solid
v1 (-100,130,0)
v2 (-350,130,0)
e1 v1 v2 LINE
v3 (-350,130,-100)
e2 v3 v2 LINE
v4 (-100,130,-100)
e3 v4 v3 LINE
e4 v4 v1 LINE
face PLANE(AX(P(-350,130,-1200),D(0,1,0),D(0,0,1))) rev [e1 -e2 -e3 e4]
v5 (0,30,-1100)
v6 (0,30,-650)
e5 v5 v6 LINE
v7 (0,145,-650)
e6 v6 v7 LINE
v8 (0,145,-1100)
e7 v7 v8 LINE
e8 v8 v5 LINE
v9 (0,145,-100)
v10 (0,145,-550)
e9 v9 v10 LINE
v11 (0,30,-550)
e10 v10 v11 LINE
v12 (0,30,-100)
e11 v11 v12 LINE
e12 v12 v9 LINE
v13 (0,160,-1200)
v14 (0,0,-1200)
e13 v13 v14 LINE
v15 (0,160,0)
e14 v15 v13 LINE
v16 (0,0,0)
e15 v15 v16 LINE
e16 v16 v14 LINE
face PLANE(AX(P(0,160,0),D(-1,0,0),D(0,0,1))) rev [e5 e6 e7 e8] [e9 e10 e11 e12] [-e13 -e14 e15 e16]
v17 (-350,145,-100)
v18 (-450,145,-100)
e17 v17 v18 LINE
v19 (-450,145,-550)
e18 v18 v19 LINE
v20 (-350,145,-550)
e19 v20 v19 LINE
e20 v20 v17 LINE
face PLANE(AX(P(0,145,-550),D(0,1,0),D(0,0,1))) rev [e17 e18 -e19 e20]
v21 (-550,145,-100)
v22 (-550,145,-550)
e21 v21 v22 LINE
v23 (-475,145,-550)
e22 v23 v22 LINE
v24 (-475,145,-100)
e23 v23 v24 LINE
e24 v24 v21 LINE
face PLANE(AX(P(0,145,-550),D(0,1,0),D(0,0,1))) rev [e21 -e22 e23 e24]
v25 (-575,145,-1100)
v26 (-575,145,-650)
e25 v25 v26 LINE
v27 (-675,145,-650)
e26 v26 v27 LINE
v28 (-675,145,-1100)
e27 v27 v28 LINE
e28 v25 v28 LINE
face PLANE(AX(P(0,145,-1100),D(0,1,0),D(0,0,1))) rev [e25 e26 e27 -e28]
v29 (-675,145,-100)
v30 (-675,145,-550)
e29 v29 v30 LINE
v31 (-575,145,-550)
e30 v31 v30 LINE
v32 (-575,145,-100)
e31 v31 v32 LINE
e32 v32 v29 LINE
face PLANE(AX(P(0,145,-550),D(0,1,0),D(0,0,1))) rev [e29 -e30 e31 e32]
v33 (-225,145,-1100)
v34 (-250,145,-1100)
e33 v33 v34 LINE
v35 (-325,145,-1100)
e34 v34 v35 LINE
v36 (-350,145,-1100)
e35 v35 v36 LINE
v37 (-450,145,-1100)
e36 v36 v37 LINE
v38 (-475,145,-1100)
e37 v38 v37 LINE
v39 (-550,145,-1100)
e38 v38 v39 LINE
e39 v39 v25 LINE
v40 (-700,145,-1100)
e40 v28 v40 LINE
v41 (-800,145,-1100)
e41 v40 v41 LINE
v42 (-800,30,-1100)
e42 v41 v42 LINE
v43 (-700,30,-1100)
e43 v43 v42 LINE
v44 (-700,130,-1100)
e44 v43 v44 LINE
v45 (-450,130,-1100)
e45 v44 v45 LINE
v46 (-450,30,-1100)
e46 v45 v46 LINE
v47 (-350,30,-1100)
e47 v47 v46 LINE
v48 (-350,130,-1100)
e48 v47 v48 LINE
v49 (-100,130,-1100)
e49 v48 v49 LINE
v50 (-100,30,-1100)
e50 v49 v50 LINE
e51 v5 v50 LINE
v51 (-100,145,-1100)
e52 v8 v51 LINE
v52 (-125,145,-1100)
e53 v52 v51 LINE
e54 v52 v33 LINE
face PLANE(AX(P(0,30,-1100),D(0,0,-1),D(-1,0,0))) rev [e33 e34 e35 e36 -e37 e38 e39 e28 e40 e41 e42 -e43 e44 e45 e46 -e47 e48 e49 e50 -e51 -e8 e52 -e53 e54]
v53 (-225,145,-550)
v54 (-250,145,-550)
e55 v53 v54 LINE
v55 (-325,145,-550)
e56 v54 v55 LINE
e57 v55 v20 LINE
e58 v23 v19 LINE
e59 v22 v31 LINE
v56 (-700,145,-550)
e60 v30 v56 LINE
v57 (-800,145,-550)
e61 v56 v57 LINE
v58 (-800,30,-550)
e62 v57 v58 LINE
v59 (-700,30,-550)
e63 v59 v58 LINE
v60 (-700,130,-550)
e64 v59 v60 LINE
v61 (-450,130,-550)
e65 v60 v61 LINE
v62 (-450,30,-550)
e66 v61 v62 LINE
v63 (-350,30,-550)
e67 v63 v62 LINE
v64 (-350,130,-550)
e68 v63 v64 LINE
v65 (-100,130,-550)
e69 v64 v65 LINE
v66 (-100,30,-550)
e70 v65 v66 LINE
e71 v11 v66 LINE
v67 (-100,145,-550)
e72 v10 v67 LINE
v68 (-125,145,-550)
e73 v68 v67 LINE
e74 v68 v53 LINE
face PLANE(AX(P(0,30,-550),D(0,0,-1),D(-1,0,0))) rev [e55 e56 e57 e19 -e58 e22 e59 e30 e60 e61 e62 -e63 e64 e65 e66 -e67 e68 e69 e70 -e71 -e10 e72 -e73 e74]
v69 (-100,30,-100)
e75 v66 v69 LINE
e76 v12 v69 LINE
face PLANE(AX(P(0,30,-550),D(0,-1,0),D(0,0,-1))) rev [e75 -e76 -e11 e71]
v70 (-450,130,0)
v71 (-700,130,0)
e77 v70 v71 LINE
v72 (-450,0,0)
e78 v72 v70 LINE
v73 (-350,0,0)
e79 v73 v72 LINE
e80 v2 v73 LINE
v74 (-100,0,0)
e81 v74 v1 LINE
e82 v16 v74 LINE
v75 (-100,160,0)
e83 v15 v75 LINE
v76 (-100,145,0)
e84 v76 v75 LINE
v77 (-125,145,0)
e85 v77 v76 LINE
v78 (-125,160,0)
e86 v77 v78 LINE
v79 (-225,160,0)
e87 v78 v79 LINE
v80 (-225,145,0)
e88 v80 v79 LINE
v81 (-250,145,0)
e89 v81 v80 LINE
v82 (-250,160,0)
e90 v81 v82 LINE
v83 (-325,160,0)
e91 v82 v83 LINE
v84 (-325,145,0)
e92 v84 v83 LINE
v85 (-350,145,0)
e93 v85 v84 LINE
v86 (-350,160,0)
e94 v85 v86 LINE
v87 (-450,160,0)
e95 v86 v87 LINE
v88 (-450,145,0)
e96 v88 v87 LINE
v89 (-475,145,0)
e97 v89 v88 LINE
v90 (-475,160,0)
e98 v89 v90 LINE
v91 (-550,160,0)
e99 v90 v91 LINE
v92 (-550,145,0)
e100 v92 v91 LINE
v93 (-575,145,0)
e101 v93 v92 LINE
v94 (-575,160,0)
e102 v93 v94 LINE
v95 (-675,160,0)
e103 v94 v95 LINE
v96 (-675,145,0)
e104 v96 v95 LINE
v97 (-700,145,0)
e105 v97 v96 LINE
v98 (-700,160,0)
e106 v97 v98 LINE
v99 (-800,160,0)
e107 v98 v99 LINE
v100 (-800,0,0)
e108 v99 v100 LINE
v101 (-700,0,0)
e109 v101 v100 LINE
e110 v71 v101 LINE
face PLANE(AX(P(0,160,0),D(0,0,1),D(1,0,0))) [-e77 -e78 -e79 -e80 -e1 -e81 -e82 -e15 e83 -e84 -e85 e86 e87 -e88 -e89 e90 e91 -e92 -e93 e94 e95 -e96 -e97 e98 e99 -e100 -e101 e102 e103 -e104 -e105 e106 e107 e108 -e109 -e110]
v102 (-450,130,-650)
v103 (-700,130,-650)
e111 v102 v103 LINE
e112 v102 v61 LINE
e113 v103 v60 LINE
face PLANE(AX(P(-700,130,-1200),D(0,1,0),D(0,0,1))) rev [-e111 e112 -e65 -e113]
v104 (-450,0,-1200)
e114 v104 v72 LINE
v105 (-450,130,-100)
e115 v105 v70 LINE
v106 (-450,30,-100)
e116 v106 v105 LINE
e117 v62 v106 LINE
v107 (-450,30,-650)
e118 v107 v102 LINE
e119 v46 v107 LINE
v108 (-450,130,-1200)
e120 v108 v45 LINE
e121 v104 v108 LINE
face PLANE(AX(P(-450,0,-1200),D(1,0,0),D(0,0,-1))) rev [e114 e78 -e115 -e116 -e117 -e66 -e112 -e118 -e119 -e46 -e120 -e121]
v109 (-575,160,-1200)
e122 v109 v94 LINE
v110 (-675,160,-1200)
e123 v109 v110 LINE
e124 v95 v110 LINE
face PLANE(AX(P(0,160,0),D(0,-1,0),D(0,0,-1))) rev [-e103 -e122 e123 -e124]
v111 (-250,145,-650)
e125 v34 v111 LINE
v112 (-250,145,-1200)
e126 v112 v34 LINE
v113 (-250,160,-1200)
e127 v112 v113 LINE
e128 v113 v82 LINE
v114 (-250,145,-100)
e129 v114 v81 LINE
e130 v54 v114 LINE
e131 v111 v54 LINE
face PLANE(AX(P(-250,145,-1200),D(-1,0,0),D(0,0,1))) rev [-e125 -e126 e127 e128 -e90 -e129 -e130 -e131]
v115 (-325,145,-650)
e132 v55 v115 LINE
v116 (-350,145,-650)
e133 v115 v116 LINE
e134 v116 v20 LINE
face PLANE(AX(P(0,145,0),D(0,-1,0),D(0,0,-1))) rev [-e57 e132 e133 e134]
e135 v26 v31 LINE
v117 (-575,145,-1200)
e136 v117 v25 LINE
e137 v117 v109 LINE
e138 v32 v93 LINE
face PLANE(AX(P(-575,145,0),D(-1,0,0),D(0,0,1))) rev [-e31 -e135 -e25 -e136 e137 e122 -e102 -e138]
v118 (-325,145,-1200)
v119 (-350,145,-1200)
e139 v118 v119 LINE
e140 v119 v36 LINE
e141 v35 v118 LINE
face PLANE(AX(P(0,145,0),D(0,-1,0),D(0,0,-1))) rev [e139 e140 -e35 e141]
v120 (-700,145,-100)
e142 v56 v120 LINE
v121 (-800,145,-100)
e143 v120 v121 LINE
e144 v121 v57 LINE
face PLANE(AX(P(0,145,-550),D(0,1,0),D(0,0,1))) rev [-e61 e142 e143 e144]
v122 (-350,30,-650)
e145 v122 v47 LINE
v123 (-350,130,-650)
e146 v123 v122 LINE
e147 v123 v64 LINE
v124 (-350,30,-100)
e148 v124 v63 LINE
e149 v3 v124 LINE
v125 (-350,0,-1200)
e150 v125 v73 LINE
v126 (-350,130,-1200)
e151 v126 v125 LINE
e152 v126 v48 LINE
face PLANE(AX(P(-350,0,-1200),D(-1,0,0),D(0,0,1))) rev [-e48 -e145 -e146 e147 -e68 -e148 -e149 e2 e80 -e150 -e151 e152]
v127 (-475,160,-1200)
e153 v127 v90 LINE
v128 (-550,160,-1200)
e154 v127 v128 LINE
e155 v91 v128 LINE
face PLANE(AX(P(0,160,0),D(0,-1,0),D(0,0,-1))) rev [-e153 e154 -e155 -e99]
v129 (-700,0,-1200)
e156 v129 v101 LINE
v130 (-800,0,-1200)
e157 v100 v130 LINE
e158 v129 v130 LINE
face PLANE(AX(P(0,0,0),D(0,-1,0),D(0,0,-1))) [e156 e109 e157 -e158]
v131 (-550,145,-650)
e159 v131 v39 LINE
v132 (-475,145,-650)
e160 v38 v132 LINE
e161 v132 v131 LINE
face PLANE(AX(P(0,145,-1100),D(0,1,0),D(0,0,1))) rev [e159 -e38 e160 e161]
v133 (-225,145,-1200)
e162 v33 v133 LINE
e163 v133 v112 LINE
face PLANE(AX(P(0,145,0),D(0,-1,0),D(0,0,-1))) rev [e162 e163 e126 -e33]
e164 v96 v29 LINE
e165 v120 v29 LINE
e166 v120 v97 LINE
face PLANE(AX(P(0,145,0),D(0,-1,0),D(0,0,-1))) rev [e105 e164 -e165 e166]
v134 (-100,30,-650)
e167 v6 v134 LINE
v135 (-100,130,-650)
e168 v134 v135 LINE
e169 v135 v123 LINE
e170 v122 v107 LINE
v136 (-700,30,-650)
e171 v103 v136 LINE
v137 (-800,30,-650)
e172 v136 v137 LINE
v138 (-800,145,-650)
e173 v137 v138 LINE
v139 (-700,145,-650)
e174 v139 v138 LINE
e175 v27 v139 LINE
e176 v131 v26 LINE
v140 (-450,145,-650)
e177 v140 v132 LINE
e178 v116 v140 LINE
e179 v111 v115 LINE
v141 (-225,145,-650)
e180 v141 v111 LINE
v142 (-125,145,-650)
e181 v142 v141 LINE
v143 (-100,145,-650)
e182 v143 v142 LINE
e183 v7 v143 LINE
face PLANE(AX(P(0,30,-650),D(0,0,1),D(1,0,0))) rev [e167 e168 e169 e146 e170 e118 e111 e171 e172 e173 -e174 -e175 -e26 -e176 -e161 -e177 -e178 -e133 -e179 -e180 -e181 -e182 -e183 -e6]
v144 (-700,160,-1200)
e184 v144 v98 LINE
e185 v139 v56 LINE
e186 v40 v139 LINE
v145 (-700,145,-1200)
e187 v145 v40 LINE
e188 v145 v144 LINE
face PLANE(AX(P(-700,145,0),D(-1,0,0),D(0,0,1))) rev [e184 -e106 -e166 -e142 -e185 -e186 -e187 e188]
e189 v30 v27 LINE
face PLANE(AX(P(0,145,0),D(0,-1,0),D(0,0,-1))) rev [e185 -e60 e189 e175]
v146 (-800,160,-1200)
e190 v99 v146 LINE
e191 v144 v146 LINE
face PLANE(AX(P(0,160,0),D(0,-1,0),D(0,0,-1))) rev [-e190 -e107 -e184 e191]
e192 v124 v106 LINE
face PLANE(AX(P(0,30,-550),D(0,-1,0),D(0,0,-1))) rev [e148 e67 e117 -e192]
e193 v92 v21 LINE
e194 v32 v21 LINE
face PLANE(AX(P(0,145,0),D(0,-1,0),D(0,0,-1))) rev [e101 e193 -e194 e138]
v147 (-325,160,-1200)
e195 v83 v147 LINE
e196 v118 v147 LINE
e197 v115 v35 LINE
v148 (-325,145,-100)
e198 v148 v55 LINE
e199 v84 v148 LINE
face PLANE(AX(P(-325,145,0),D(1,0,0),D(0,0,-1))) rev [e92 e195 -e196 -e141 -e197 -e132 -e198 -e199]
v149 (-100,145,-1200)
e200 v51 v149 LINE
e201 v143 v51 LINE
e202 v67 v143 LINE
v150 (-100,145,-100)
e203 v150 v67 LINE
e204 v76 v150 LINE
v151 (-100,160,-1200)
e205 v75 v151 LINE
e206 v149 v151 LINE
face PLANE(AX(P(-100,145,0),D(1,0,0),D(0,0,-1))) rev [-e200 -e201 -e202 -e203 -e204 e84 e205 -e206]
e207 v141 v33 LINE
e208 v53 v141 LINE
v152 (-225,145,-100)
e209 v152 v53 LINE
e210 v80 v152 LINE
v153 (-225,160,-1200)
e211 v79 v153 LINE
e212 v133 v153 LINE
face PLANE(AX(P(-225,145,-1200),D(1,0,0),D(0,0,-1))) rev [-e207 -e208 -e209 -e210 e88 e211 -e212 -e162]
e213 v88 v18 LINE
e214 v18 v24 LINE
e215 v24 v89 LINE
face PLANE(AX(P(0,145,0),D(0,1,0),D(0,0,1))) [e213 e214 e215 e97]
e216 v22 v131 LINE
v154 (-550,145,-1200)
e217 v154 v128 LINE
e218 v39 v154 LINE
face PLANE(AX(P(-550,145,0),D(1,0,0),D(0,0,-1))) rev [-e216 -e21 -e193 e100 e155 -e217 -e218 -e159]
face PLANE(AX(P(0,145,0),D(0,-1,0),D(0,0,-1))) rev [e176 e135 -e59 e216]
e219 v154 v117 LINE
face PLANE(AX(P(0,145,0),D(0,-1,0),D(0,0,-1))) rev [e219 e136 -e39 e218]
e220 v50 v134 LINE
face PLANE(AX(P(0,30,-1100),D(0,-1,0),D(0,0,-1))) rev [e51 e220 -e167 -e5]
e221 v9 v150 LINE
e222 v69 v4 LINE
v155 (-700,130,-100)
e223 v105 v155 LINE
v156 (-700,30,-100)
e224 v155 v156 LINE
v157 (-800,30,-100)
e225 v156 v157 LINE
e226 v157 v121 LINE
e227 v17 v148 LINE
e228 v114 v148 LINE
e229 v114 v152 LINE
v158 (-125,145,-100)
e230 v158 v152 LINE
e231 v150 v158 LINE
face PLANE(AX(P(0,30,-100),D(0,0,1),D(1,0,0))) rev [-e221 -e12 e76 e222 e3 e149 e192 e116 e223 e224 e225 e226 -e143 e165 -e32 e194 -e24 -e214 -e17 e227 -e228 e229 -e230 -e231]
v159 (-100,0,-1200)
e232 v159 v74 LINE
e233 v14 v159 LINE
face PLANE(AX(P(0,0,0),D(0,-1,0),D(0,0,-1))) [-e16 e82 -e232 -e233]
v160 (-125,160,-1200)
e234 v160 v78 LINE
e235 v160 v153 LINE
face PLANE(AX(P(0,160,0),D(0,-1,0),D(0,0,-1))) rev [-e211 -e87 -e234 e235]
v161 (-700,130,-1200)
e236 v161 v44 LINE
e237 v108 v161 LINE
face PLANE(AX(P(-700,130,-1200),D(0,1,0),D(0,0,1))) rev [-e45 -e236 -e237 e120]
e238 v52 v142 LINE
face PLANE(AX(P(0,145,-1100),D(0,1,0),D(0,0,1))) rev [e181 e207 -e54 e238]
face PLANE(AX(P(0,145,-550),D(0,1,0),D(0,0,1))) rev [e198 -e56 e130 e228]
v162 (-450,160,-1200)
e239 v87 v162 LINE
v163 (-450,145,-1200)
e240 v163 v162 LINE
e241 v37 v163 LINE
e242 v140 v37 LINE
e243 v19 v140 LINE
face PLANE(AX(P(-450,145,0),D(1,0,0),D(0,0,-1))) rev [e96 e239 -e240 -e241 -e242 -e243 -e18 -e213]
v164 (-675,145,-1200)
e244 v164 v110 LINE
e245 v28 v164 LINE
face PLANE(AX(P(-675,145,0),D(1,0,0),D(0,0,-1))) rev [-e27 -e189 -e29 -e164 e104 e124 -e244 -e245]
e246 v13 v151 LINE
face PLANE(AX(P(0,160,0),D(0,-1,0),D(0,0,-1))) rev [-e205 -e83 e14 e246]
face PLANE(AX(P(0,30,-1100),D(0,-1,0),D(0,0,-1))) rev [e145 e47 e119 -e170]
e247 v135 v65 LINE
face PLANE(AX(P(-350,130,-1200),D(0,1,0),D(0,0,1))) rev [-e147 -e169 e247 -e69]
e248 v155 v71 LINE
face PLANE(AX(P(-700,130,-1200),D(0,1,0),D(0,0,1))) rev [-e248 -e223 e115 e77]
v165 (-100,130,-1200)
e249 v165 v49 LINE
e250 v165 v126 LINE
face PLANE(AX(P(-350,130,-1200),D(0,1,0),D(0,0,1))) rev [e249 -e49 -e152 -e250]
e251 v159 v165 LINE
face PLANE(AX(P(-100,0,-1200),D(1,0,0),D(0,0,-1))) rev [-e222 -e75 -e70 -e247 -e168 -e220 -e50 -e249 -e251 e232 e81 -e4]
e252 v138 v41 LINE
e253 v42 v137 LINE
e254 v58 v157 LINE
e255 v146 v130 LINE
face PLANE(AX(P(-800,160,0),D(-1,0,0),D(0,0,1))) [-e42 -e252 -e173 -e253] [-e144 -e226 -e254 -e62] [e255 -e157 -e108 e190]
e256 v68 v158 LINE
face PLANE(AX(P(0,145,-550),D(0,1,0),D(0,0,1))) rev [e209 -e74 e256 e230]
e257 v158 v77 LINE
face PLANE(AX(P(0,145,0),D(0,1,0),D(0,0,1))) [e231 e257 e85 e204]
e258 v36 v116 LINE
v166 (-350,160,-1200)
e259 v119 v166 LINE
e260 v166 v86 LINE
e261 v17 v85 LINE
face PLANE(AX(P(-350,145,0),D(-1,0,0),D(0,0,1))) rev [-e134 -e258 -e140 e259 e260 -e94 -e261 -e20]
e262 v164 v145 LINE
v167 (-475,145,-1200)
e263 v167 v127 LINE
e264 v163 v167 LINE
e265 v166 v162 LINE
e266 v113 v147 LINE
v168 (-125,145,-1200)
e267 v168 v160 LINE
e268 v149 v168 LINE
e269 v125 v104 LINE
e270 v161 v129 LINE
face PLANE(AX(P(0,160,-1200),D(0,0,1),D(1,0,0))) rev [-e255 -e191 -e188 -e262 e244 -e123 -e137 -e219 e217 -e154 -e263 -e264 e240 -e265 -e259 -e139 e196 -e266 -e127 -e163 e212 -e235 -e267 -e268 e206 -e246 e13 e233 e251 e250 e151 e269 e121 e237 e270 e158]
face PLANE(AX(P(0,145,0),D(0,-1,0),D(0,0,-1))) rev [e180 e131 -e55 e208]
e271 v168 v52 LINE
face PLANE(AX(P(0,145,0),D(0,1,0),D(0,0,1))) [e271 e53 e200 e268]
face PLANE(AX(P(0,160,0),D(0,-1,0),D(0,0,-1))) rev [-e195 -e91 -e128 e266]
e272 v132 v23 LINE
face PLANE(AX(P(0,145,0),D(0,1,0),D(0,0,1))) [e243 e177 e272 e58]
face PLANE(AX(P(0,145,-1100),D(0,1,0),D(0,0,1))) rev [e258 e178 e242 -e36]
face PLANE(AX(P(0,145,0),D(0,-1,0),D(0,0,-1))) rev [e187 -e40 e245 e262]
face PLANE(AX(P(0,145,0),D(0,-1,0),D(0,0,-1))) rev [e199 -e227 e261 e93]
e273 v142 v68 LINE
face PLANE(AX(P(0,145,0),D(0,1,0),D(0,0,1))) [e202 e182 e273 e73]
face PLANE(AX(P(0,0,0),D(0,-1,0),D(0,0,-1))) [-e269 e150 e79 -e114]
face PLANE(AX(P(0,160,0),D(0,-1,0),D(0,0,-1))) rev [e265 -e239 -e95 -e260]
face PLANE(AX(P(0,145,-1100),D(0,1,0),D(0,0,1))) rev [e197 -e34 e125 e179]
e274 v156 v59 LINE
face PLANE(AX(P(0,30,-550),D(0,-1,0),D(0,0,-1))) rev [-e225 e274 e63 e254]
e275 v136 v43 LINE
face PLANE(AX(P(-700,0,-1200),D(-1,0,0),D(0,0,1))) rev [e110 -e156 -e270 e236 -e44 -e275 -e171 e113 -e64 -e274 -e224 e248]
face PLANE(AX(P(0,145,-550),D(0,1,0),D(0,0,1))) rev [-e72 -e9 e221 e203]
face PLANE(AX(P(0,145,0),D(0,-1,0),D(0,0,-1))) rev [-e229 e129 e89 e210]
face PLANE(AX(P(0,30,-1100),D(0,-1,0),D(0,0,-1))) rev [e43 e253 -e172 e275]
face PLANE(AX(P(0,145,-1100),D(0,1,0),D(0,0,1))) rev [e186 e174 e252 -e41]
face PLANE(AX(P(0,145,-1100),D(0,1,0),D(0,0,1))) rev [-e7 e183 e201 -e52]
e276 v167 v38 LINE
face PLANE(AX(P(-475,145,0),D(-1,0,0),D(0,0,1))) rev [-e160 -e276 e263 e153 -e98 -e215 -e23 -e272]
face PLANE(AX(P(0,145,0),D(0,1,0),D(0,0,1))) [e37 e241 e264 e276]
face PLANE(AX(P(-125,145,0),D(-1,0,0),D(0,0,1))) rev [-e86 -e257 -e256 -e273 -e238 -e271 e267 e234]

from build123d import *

# Parameters (mm, degrees)
SKETCH1_W              = 800
SKETCH1_H              = 1200
BOSS_EXTRUDE2_DEPTH    = 160
CUT_EXTRUDE2_START     = -800
CUT_EXTRUDE2_OUTLINE_W = 450
CUT_EXTRUDE2_OUTLINE_H = 115
CUT_EXTRUDE2_DEPTH     = 800
SKETCH4_W              = 250
SKETCH4_H              = 130
CUT_EXTRUDE3_DEPTH     = 1452.068571777
SKETCH6_W              = 25
SKETCH6_H              = 1200
CUT_EXTRUDE5_DEPTH     = 15


# Read off the part's stored shape, not the designer's step: Cut-Extrude2
with BuildPart() as part:
    # Sketch1 → Boss-Extrude2 (new body)
    with BuildSketch(Plane(origin=(0, 0, 0), x_dir=(1, 0, 0), z_dir=(0, 1, 0))):
        with Locations((-400, 600)):
            Rectangle(SKETCH1_W, SKETCH1_H)
    extrude(amount=BOSS_EXTRUDE2_DEPTH)

    # Cut-Extrude2 outline → Cut-Extrude2 (cut)
    with BuildSketch(Plane.ZY.offset(800).offset(CUT_EXTRUDE2_START)):
        with Locations((-325, 87.5)):
            Rectangle(CUT_EXTRUDE2_OUTLINE_W, CUT_EXTRUDE2_OUTLINE_H)
        with Locations((-875, 87.5)):
            Rectangle(CUT_EXTRUDE2_OUTLINE_W, CUT_EXTRUDE2_OUTLINE_H)
    extrude(amount=CUT_EXTRUDE2_DEPTH, mode=Mode.SUBTRACT)

    # Sketch4 → Cut-Extrude3 (cut, through all)
    with BuildSketch(Plane.XY):
        with Locations((-575, 65)):
            Rectangle(SKETCH4_W, SKETCH4_H)
        with Locations((-225, 65)):
            Rectangle(SKETCH4_W, SKETCH4_H)
    extrude(amount=-CUT_EXTRUDE3_DEPTH, mode=Mode.SUBTRACT)

    # Sketch6 → Cut-Extrude5 (cut)
    with BuildSketch(Plane(origin=(0, 160, 0), x_dir=(1, 0, 0), z_dir=(0, 1, 0))):
        with Locations((-687.5, 600)):
            Rectangle(SKETCH6_W, SKETCH6_H)
        with Locations((-462.5, 600)):
            Rectangle(SKETCH6_W, SKETCH6_H)
        with Locations((-562.5, 600)):
            Rectangle(SKETCH6_W, SKETCH6_H)
        with Locations((-337.5, 600)):
            Rectangle(SKETCH6_W, SKETCH6_H)
        with Locations((-112.5, 600)):
            Rectangle(SKETCH6_W, SKETCH6_H)
        with Locations((-237.5, 600)):
            Rectangle(SKETCH6_W, SKETCH6_H)
    extrude(amount=-CUT_EXTRUDE5_DEPTH, mode=Mode.SUBTRACT)


solid = part.part
